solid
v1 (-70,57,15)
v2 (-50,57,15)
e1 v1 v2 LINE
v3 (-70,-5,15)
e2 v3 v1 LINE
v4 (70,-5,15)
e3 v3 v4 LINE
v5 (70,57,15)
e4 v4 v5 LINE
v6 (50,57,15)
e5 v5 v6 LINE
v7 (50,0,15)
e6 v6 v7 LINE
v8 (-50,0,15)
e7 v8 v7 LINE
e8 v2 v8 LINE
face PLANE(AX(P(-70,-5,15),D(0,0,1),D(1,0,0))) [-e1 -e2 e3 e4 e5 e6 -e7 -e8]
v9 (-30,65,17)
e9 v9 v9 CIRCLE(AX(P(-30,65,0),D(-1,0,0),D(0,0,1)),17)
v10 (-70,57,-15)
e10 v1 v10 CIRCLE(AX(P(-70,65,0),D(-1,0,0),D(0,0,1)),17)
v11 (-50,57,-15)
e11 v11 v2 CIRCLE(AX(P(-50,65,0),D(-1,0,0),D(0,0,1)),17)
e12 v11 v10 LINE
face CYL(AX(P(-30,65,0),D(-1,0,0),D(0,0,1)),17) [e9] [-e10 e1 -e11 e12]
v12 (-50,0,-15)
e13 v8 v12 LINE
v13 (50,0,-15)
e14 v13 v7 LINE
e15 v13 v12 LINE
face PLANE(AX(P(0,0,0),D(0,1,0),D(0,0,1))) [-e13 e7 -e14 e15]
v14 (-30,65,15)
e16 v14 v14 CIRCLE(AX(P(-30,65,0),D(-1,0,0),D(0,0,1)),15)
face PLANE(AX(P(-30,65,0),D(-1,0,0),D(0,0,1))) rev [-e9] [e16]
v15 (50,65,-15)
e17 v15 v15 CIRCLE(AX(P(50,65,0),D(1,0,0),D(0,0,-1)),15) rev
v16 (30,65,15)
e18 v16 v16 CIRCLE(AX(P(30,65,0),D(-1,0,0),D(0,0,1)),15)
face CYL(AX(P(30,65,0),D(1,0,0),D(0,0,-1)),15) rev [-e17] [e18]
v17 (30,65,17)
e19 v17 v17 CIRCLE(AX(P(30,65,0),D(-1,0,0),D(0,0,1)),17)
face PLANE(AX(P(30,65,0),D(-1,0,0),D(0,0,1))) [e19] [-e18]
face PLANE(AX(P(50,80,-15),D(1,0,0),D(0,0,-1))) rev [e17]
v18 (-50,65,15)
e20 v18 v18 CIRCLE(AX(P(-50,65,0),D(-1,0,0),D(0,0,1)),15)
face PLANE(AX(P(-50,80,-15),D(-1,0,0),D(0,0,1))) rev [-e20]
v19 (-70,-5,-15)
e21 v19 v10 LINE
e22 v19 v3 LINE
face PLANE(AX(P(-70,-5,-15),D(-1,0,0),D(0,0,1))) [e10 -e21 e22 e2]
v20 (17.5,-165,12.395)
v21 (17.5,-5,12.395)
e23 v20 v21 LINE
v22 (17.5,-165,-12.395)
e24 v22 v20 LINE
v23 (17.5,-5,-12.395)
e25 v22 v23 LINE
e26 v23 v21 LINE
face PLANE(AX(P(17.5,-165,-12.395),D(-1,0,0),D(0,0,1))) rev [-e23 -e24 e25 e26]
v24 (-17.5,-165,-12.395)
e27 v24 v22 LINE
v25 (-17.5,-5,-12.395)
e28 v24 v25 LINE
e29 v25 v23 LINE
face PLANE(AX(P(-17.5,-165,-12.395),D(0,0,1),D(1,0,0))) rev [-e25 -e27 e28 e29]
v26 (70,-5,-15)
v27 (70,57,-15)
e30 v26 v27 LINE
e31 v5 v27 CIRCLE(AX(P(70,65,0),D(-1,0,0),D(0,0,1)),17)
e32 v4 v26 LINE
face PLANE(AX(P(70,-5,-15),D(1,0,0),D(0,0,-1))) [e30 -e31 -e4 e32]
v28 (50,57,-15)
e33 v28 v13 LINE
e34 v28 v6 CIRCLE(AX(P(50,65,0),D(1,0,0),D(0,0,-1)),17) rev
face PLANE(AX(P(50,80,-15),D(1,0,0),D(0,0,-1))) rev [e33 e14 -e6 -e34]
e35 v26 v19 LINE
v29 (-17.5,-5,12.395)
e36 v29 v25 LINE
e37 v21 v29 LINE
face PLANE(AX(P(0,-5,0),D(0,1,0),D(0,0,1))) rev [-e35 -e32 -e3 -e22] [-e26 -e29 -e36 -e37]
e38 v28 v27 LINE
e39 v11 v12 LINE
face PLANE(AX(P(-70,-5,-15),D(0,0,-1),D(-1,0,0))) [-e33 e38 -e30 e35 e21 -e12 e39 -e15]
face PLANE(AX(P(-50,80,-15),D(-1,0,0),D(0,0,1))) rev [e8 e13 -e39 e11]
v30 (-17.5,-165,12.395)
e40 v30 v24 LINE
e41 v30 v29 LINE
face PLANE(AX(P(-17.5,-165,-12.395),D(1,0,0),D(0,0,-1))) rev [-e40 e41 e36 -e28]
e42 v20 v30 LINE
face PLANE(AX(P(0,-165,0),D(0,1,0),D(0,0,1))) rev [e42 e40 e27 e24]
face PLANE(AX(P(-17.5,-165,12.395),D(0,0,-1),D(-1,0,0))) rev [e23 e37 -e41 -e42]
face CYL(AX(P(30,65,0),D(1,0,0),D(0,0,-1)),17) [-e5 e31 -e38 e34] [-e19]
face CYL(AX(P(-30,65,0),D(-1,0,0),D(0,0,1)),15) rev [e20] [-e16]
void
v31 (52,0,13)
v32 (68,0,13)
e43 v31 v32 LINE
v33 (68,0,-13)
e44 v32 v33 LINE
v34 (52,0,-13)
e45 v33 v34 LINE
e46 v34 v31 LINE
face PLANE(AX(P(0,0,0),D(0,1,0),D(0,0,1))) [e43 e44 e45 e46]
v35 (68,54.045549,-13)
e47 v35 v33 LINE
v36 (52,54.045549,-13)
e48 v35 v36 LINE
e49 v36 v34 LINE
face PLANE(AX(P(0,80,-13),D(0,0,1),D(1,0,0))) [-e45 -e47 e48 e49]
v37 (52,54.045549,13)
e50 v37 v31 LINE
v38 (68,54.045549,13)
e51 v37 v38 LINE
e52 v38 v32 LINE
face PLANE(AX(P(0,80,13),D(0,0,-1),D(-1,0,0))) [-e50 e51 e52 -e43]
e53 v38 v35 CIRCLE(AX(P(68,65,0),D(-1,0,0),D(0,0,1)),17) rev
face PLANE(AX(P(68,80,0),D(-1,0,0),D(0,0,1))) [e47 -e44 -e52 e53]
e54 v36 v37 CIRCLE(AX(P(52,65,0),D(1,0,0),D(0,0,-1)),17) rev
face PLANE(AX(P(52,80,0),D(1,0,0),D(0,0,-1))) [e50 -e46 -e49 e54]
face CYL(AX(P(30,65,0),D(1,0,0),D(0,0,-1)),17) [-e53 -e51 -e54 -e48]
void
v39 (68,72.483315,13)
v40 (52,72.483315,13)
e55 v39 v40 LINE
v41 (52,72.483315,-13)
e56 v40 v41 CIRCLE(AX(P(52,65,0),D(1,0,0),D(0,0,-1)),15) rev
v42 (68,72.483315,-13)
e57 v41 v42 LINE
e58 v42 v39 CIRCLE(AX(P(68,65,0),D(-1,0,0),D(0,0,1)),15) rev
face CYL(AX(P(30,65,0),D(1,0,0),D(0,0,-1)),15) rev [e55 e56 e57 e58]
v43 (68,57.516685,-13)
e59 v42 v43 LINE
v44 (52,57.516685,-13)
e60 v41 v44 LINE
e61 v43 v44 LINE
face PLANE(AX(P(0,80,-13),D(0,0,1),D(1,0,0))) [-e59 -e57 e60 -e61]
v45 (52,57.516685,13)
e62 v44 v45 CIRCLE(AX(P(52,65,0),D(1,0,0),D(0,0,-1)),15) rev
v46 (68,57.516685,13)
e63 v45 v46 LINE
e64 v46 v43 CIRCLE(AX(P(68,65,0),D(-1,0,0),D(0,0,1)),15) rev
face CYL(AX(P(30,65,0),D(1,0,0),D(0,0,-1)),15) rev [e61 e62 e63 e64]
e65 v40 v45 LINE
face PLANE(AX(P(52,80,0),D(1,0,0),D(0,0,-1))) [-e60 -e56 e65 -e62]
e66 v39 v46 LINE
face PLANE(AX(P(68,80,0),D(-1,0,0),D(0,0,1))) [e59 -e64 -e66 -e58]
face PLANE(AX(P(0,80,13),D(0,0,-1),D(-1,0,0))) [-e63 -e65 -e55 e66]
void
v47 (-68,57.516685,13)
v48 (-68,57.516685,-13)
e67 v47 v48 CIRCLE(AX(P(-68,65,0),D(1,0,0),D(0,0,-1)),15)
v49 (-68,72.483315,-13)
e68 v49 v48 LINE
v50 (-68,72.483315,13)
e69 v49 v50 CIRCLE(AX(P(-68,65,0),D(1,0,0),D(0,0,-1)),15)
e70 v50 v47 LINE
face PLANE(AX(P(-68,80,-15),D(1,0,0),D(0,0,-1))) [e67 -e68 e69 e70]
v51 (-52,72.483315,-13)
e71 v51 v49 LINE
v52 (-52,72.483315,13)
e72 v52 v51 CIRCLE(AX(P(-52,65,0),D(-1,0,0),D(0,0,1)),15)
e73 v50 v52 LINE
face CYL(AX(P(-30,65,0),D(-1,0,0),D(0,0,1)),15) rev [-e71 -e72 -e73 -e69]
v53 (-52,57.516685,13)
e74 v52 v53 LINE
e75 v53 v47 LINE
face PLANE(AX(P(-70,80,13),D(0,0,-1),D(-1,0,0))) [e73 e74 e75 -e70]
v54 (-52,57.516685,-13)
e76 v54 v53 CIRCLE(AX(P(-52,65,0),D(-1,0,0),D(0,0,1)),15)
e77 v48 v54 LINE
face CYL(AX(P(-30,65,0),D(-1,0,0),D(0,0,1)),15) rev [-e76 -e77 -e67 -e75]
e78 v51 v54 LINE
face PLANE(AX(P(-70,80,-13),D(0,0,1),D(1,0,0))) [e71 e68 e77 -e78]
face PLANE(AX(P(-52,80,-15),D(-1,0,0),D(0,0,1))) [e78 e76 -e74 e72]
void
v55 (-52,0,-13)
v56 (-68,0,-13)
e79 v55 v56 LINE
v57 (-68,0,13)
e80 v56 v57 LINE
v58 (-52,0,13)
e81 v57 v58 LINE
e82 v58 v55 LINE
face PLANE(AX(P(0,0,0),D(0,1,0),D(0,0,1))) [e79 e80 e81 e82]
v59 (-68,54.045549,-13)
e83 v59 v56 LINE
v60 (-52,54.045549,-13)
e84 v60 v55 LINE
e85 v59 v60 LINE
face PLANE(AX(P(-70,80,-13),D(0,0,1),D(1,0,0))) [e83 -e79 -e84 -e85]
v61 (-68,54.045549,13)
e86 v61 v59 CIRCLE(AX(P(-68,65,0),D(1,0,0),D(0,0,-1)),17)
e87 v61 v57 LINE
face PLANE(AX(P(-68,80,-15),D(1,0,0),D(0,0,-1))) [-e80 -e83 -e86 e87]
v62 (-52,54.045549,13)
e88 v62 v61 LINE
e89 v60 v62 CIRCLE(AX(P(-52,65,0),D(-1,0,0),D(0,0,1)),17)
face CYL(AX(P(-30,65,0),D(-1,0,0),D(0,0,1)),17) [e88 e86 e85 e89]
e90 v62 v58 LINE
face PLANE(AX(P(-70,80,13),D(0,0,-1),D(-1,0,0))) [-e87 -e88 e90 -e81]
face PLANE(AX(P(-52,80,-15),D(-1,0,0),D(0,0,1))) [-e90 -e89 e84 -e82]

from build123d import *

# Parameters (mm, degrees)
SKETCH1_W                 = 140
SKETCH1_H                 = 30
BOSS_EXTRUDE1_DEPTH       = 5
EXTRUDE_THIN1_START       = -5
EXTRUDE_THIN1_OUTLINE_W   = 20
EXTRUDE_THIN1_OUTLINE_H   = 30
EXTRUDE_THIN1_OUTLINE_W_2 = 16
EXTRUDE_THIN1_OUTLINE_H_2 = 26
EXTRUDE_THIN1_DEPTH       = 85
FILLET1_SIZE              = 15
SKETCH3_R                 = 17
SKETCH3_R_2               = 15
EXTRUDE_THIN2_DEPTH       = 40
SKETCH4_W                 = 35
SKETCH4_H                 = 24.79
BOSS_EXTRUDE2_DEPTH       = 160


with BuildPart() as part:
    # Sketch1 → Boss-Extrude1 (new body)
    with BuildSketch(Plane(origin=(0, 0, 0), x_dir=(1, 0, 0), z_dir=(0, 1, 0))):
        Rectangle(SKETCH1_W, SKETCH1_H)
    extrude(amount=-BOSS_EXTRUDE1_DEPTH)

    # Extrude-Thin1: read off the stored shape, not the designer's step
    # Extrude-Thin1 outline → Extrude-Thin1 (add)
    # profile 1 of 2: a face of its own
    with BuildSketch(Plane(origin=(0, 0, 0), x_dir=(1, 0, 0), z_dir=(0, 1, 0)).offset(EXTRUDE_THIN1_START)):
        with Locations((60, 0)):
            Rectangle(EXTRUDE_THIN1_OUTLINE_W, EXTRUDE_THIN1_OUTLINE_H)
        with Locations((60, 0)):
            Rectangle(EXTRUDE_THIN1_OUTLINE_W_2, EXTRUDE_THIN1_OUTLINE_H_2, mode=Mode.SUBTRACT)
    # profile 2 of 2: a face of its own
    with BuildSketch(Plane(origin=(0, 0, 0), x_dir=(1, 0, 0), z_dir=(0, 1, 0)).offset(EXTRUDE_THIN1_START)):
        with Locations((-60, 0)):
            Rectangle(EXTRUDE_THIN1_OUTLINE_W, EXTRUDE_THIN1_OUTLINE_H)
        with Locations((-60, 0)):
            Rectangle(EXTRUDE_THIN1_OUTLINE_W_2, EXTRUDE_THIN1_OUTLINE_H_2, mode=Mode.SUBTRACT)
    extrude(amount=EXTRUDE_THIN1_DEPTH)

    # Fillet1
    # a fillet whose section is not a circle: 15 mm, written as the material it takes off along each edge
    with BuildSketch(Plane(origin=(-107.5, 80, 15), x_dir=(0, -1, 0), z_dir=(1, 0, 0)), Plane(origin=(-12.5, 80, -15), x_dir=(0, -1, 0), z_dir=(-1, 0, 0)), Plane(origin=(107.5, 80, -15), x_dir=(0, -1, 0), z_dir=(-1, 0, 0)), Plane(origin=(12.5, 80, 15), x_dir=(0, -1, 0), z_dir=(1, 0, 0))) as fillet1_piece_1:
        with BuildLine():
            Bezier((FILLET1_SIZE, 0), (0, 0), (0, FILLET1_SIZE), weights=[1, 1.060660172, 1])
            Line((0, FILLET1_SIZE), (0, 0))
            Line((0, 0), (FILLET1_SIZE, 0))
        make_face()
    extrude(amount=95, mode=Mode.SUBTRACT)

    # Sketch3 → Extrude-Thin2 (add)
    with BuildSketch(Plane.ZY.offset(70)):
        with Locations((0, 65)):
            Circle(SKETCH3_R)
        with Locations((0, 65)):
            Circle(SKETCH3_R_2, mode=Mode.SUBTRACT)
    extrude_thin2 = extrude(amount=-EXTRUDE_THIN2_DEPTH)

    # Mirror1: Extrude-Thin2 across plane
    add(extrude_thin2.mirror(Plane(origin=(0, 0, 0), x_dir=(0, 0, 1), z_dir=(1, 0, 0))))

    # Sketch4 → Boss-Extrude2 (add)
    with BuildSketch(Plane.XZ.offset(5)):
        Rectangle(SKETCH4_W, SKETCH4_H)
    extrude(amount=BOSS_EXTRUDE2_DEPTH)


solid = part.part
